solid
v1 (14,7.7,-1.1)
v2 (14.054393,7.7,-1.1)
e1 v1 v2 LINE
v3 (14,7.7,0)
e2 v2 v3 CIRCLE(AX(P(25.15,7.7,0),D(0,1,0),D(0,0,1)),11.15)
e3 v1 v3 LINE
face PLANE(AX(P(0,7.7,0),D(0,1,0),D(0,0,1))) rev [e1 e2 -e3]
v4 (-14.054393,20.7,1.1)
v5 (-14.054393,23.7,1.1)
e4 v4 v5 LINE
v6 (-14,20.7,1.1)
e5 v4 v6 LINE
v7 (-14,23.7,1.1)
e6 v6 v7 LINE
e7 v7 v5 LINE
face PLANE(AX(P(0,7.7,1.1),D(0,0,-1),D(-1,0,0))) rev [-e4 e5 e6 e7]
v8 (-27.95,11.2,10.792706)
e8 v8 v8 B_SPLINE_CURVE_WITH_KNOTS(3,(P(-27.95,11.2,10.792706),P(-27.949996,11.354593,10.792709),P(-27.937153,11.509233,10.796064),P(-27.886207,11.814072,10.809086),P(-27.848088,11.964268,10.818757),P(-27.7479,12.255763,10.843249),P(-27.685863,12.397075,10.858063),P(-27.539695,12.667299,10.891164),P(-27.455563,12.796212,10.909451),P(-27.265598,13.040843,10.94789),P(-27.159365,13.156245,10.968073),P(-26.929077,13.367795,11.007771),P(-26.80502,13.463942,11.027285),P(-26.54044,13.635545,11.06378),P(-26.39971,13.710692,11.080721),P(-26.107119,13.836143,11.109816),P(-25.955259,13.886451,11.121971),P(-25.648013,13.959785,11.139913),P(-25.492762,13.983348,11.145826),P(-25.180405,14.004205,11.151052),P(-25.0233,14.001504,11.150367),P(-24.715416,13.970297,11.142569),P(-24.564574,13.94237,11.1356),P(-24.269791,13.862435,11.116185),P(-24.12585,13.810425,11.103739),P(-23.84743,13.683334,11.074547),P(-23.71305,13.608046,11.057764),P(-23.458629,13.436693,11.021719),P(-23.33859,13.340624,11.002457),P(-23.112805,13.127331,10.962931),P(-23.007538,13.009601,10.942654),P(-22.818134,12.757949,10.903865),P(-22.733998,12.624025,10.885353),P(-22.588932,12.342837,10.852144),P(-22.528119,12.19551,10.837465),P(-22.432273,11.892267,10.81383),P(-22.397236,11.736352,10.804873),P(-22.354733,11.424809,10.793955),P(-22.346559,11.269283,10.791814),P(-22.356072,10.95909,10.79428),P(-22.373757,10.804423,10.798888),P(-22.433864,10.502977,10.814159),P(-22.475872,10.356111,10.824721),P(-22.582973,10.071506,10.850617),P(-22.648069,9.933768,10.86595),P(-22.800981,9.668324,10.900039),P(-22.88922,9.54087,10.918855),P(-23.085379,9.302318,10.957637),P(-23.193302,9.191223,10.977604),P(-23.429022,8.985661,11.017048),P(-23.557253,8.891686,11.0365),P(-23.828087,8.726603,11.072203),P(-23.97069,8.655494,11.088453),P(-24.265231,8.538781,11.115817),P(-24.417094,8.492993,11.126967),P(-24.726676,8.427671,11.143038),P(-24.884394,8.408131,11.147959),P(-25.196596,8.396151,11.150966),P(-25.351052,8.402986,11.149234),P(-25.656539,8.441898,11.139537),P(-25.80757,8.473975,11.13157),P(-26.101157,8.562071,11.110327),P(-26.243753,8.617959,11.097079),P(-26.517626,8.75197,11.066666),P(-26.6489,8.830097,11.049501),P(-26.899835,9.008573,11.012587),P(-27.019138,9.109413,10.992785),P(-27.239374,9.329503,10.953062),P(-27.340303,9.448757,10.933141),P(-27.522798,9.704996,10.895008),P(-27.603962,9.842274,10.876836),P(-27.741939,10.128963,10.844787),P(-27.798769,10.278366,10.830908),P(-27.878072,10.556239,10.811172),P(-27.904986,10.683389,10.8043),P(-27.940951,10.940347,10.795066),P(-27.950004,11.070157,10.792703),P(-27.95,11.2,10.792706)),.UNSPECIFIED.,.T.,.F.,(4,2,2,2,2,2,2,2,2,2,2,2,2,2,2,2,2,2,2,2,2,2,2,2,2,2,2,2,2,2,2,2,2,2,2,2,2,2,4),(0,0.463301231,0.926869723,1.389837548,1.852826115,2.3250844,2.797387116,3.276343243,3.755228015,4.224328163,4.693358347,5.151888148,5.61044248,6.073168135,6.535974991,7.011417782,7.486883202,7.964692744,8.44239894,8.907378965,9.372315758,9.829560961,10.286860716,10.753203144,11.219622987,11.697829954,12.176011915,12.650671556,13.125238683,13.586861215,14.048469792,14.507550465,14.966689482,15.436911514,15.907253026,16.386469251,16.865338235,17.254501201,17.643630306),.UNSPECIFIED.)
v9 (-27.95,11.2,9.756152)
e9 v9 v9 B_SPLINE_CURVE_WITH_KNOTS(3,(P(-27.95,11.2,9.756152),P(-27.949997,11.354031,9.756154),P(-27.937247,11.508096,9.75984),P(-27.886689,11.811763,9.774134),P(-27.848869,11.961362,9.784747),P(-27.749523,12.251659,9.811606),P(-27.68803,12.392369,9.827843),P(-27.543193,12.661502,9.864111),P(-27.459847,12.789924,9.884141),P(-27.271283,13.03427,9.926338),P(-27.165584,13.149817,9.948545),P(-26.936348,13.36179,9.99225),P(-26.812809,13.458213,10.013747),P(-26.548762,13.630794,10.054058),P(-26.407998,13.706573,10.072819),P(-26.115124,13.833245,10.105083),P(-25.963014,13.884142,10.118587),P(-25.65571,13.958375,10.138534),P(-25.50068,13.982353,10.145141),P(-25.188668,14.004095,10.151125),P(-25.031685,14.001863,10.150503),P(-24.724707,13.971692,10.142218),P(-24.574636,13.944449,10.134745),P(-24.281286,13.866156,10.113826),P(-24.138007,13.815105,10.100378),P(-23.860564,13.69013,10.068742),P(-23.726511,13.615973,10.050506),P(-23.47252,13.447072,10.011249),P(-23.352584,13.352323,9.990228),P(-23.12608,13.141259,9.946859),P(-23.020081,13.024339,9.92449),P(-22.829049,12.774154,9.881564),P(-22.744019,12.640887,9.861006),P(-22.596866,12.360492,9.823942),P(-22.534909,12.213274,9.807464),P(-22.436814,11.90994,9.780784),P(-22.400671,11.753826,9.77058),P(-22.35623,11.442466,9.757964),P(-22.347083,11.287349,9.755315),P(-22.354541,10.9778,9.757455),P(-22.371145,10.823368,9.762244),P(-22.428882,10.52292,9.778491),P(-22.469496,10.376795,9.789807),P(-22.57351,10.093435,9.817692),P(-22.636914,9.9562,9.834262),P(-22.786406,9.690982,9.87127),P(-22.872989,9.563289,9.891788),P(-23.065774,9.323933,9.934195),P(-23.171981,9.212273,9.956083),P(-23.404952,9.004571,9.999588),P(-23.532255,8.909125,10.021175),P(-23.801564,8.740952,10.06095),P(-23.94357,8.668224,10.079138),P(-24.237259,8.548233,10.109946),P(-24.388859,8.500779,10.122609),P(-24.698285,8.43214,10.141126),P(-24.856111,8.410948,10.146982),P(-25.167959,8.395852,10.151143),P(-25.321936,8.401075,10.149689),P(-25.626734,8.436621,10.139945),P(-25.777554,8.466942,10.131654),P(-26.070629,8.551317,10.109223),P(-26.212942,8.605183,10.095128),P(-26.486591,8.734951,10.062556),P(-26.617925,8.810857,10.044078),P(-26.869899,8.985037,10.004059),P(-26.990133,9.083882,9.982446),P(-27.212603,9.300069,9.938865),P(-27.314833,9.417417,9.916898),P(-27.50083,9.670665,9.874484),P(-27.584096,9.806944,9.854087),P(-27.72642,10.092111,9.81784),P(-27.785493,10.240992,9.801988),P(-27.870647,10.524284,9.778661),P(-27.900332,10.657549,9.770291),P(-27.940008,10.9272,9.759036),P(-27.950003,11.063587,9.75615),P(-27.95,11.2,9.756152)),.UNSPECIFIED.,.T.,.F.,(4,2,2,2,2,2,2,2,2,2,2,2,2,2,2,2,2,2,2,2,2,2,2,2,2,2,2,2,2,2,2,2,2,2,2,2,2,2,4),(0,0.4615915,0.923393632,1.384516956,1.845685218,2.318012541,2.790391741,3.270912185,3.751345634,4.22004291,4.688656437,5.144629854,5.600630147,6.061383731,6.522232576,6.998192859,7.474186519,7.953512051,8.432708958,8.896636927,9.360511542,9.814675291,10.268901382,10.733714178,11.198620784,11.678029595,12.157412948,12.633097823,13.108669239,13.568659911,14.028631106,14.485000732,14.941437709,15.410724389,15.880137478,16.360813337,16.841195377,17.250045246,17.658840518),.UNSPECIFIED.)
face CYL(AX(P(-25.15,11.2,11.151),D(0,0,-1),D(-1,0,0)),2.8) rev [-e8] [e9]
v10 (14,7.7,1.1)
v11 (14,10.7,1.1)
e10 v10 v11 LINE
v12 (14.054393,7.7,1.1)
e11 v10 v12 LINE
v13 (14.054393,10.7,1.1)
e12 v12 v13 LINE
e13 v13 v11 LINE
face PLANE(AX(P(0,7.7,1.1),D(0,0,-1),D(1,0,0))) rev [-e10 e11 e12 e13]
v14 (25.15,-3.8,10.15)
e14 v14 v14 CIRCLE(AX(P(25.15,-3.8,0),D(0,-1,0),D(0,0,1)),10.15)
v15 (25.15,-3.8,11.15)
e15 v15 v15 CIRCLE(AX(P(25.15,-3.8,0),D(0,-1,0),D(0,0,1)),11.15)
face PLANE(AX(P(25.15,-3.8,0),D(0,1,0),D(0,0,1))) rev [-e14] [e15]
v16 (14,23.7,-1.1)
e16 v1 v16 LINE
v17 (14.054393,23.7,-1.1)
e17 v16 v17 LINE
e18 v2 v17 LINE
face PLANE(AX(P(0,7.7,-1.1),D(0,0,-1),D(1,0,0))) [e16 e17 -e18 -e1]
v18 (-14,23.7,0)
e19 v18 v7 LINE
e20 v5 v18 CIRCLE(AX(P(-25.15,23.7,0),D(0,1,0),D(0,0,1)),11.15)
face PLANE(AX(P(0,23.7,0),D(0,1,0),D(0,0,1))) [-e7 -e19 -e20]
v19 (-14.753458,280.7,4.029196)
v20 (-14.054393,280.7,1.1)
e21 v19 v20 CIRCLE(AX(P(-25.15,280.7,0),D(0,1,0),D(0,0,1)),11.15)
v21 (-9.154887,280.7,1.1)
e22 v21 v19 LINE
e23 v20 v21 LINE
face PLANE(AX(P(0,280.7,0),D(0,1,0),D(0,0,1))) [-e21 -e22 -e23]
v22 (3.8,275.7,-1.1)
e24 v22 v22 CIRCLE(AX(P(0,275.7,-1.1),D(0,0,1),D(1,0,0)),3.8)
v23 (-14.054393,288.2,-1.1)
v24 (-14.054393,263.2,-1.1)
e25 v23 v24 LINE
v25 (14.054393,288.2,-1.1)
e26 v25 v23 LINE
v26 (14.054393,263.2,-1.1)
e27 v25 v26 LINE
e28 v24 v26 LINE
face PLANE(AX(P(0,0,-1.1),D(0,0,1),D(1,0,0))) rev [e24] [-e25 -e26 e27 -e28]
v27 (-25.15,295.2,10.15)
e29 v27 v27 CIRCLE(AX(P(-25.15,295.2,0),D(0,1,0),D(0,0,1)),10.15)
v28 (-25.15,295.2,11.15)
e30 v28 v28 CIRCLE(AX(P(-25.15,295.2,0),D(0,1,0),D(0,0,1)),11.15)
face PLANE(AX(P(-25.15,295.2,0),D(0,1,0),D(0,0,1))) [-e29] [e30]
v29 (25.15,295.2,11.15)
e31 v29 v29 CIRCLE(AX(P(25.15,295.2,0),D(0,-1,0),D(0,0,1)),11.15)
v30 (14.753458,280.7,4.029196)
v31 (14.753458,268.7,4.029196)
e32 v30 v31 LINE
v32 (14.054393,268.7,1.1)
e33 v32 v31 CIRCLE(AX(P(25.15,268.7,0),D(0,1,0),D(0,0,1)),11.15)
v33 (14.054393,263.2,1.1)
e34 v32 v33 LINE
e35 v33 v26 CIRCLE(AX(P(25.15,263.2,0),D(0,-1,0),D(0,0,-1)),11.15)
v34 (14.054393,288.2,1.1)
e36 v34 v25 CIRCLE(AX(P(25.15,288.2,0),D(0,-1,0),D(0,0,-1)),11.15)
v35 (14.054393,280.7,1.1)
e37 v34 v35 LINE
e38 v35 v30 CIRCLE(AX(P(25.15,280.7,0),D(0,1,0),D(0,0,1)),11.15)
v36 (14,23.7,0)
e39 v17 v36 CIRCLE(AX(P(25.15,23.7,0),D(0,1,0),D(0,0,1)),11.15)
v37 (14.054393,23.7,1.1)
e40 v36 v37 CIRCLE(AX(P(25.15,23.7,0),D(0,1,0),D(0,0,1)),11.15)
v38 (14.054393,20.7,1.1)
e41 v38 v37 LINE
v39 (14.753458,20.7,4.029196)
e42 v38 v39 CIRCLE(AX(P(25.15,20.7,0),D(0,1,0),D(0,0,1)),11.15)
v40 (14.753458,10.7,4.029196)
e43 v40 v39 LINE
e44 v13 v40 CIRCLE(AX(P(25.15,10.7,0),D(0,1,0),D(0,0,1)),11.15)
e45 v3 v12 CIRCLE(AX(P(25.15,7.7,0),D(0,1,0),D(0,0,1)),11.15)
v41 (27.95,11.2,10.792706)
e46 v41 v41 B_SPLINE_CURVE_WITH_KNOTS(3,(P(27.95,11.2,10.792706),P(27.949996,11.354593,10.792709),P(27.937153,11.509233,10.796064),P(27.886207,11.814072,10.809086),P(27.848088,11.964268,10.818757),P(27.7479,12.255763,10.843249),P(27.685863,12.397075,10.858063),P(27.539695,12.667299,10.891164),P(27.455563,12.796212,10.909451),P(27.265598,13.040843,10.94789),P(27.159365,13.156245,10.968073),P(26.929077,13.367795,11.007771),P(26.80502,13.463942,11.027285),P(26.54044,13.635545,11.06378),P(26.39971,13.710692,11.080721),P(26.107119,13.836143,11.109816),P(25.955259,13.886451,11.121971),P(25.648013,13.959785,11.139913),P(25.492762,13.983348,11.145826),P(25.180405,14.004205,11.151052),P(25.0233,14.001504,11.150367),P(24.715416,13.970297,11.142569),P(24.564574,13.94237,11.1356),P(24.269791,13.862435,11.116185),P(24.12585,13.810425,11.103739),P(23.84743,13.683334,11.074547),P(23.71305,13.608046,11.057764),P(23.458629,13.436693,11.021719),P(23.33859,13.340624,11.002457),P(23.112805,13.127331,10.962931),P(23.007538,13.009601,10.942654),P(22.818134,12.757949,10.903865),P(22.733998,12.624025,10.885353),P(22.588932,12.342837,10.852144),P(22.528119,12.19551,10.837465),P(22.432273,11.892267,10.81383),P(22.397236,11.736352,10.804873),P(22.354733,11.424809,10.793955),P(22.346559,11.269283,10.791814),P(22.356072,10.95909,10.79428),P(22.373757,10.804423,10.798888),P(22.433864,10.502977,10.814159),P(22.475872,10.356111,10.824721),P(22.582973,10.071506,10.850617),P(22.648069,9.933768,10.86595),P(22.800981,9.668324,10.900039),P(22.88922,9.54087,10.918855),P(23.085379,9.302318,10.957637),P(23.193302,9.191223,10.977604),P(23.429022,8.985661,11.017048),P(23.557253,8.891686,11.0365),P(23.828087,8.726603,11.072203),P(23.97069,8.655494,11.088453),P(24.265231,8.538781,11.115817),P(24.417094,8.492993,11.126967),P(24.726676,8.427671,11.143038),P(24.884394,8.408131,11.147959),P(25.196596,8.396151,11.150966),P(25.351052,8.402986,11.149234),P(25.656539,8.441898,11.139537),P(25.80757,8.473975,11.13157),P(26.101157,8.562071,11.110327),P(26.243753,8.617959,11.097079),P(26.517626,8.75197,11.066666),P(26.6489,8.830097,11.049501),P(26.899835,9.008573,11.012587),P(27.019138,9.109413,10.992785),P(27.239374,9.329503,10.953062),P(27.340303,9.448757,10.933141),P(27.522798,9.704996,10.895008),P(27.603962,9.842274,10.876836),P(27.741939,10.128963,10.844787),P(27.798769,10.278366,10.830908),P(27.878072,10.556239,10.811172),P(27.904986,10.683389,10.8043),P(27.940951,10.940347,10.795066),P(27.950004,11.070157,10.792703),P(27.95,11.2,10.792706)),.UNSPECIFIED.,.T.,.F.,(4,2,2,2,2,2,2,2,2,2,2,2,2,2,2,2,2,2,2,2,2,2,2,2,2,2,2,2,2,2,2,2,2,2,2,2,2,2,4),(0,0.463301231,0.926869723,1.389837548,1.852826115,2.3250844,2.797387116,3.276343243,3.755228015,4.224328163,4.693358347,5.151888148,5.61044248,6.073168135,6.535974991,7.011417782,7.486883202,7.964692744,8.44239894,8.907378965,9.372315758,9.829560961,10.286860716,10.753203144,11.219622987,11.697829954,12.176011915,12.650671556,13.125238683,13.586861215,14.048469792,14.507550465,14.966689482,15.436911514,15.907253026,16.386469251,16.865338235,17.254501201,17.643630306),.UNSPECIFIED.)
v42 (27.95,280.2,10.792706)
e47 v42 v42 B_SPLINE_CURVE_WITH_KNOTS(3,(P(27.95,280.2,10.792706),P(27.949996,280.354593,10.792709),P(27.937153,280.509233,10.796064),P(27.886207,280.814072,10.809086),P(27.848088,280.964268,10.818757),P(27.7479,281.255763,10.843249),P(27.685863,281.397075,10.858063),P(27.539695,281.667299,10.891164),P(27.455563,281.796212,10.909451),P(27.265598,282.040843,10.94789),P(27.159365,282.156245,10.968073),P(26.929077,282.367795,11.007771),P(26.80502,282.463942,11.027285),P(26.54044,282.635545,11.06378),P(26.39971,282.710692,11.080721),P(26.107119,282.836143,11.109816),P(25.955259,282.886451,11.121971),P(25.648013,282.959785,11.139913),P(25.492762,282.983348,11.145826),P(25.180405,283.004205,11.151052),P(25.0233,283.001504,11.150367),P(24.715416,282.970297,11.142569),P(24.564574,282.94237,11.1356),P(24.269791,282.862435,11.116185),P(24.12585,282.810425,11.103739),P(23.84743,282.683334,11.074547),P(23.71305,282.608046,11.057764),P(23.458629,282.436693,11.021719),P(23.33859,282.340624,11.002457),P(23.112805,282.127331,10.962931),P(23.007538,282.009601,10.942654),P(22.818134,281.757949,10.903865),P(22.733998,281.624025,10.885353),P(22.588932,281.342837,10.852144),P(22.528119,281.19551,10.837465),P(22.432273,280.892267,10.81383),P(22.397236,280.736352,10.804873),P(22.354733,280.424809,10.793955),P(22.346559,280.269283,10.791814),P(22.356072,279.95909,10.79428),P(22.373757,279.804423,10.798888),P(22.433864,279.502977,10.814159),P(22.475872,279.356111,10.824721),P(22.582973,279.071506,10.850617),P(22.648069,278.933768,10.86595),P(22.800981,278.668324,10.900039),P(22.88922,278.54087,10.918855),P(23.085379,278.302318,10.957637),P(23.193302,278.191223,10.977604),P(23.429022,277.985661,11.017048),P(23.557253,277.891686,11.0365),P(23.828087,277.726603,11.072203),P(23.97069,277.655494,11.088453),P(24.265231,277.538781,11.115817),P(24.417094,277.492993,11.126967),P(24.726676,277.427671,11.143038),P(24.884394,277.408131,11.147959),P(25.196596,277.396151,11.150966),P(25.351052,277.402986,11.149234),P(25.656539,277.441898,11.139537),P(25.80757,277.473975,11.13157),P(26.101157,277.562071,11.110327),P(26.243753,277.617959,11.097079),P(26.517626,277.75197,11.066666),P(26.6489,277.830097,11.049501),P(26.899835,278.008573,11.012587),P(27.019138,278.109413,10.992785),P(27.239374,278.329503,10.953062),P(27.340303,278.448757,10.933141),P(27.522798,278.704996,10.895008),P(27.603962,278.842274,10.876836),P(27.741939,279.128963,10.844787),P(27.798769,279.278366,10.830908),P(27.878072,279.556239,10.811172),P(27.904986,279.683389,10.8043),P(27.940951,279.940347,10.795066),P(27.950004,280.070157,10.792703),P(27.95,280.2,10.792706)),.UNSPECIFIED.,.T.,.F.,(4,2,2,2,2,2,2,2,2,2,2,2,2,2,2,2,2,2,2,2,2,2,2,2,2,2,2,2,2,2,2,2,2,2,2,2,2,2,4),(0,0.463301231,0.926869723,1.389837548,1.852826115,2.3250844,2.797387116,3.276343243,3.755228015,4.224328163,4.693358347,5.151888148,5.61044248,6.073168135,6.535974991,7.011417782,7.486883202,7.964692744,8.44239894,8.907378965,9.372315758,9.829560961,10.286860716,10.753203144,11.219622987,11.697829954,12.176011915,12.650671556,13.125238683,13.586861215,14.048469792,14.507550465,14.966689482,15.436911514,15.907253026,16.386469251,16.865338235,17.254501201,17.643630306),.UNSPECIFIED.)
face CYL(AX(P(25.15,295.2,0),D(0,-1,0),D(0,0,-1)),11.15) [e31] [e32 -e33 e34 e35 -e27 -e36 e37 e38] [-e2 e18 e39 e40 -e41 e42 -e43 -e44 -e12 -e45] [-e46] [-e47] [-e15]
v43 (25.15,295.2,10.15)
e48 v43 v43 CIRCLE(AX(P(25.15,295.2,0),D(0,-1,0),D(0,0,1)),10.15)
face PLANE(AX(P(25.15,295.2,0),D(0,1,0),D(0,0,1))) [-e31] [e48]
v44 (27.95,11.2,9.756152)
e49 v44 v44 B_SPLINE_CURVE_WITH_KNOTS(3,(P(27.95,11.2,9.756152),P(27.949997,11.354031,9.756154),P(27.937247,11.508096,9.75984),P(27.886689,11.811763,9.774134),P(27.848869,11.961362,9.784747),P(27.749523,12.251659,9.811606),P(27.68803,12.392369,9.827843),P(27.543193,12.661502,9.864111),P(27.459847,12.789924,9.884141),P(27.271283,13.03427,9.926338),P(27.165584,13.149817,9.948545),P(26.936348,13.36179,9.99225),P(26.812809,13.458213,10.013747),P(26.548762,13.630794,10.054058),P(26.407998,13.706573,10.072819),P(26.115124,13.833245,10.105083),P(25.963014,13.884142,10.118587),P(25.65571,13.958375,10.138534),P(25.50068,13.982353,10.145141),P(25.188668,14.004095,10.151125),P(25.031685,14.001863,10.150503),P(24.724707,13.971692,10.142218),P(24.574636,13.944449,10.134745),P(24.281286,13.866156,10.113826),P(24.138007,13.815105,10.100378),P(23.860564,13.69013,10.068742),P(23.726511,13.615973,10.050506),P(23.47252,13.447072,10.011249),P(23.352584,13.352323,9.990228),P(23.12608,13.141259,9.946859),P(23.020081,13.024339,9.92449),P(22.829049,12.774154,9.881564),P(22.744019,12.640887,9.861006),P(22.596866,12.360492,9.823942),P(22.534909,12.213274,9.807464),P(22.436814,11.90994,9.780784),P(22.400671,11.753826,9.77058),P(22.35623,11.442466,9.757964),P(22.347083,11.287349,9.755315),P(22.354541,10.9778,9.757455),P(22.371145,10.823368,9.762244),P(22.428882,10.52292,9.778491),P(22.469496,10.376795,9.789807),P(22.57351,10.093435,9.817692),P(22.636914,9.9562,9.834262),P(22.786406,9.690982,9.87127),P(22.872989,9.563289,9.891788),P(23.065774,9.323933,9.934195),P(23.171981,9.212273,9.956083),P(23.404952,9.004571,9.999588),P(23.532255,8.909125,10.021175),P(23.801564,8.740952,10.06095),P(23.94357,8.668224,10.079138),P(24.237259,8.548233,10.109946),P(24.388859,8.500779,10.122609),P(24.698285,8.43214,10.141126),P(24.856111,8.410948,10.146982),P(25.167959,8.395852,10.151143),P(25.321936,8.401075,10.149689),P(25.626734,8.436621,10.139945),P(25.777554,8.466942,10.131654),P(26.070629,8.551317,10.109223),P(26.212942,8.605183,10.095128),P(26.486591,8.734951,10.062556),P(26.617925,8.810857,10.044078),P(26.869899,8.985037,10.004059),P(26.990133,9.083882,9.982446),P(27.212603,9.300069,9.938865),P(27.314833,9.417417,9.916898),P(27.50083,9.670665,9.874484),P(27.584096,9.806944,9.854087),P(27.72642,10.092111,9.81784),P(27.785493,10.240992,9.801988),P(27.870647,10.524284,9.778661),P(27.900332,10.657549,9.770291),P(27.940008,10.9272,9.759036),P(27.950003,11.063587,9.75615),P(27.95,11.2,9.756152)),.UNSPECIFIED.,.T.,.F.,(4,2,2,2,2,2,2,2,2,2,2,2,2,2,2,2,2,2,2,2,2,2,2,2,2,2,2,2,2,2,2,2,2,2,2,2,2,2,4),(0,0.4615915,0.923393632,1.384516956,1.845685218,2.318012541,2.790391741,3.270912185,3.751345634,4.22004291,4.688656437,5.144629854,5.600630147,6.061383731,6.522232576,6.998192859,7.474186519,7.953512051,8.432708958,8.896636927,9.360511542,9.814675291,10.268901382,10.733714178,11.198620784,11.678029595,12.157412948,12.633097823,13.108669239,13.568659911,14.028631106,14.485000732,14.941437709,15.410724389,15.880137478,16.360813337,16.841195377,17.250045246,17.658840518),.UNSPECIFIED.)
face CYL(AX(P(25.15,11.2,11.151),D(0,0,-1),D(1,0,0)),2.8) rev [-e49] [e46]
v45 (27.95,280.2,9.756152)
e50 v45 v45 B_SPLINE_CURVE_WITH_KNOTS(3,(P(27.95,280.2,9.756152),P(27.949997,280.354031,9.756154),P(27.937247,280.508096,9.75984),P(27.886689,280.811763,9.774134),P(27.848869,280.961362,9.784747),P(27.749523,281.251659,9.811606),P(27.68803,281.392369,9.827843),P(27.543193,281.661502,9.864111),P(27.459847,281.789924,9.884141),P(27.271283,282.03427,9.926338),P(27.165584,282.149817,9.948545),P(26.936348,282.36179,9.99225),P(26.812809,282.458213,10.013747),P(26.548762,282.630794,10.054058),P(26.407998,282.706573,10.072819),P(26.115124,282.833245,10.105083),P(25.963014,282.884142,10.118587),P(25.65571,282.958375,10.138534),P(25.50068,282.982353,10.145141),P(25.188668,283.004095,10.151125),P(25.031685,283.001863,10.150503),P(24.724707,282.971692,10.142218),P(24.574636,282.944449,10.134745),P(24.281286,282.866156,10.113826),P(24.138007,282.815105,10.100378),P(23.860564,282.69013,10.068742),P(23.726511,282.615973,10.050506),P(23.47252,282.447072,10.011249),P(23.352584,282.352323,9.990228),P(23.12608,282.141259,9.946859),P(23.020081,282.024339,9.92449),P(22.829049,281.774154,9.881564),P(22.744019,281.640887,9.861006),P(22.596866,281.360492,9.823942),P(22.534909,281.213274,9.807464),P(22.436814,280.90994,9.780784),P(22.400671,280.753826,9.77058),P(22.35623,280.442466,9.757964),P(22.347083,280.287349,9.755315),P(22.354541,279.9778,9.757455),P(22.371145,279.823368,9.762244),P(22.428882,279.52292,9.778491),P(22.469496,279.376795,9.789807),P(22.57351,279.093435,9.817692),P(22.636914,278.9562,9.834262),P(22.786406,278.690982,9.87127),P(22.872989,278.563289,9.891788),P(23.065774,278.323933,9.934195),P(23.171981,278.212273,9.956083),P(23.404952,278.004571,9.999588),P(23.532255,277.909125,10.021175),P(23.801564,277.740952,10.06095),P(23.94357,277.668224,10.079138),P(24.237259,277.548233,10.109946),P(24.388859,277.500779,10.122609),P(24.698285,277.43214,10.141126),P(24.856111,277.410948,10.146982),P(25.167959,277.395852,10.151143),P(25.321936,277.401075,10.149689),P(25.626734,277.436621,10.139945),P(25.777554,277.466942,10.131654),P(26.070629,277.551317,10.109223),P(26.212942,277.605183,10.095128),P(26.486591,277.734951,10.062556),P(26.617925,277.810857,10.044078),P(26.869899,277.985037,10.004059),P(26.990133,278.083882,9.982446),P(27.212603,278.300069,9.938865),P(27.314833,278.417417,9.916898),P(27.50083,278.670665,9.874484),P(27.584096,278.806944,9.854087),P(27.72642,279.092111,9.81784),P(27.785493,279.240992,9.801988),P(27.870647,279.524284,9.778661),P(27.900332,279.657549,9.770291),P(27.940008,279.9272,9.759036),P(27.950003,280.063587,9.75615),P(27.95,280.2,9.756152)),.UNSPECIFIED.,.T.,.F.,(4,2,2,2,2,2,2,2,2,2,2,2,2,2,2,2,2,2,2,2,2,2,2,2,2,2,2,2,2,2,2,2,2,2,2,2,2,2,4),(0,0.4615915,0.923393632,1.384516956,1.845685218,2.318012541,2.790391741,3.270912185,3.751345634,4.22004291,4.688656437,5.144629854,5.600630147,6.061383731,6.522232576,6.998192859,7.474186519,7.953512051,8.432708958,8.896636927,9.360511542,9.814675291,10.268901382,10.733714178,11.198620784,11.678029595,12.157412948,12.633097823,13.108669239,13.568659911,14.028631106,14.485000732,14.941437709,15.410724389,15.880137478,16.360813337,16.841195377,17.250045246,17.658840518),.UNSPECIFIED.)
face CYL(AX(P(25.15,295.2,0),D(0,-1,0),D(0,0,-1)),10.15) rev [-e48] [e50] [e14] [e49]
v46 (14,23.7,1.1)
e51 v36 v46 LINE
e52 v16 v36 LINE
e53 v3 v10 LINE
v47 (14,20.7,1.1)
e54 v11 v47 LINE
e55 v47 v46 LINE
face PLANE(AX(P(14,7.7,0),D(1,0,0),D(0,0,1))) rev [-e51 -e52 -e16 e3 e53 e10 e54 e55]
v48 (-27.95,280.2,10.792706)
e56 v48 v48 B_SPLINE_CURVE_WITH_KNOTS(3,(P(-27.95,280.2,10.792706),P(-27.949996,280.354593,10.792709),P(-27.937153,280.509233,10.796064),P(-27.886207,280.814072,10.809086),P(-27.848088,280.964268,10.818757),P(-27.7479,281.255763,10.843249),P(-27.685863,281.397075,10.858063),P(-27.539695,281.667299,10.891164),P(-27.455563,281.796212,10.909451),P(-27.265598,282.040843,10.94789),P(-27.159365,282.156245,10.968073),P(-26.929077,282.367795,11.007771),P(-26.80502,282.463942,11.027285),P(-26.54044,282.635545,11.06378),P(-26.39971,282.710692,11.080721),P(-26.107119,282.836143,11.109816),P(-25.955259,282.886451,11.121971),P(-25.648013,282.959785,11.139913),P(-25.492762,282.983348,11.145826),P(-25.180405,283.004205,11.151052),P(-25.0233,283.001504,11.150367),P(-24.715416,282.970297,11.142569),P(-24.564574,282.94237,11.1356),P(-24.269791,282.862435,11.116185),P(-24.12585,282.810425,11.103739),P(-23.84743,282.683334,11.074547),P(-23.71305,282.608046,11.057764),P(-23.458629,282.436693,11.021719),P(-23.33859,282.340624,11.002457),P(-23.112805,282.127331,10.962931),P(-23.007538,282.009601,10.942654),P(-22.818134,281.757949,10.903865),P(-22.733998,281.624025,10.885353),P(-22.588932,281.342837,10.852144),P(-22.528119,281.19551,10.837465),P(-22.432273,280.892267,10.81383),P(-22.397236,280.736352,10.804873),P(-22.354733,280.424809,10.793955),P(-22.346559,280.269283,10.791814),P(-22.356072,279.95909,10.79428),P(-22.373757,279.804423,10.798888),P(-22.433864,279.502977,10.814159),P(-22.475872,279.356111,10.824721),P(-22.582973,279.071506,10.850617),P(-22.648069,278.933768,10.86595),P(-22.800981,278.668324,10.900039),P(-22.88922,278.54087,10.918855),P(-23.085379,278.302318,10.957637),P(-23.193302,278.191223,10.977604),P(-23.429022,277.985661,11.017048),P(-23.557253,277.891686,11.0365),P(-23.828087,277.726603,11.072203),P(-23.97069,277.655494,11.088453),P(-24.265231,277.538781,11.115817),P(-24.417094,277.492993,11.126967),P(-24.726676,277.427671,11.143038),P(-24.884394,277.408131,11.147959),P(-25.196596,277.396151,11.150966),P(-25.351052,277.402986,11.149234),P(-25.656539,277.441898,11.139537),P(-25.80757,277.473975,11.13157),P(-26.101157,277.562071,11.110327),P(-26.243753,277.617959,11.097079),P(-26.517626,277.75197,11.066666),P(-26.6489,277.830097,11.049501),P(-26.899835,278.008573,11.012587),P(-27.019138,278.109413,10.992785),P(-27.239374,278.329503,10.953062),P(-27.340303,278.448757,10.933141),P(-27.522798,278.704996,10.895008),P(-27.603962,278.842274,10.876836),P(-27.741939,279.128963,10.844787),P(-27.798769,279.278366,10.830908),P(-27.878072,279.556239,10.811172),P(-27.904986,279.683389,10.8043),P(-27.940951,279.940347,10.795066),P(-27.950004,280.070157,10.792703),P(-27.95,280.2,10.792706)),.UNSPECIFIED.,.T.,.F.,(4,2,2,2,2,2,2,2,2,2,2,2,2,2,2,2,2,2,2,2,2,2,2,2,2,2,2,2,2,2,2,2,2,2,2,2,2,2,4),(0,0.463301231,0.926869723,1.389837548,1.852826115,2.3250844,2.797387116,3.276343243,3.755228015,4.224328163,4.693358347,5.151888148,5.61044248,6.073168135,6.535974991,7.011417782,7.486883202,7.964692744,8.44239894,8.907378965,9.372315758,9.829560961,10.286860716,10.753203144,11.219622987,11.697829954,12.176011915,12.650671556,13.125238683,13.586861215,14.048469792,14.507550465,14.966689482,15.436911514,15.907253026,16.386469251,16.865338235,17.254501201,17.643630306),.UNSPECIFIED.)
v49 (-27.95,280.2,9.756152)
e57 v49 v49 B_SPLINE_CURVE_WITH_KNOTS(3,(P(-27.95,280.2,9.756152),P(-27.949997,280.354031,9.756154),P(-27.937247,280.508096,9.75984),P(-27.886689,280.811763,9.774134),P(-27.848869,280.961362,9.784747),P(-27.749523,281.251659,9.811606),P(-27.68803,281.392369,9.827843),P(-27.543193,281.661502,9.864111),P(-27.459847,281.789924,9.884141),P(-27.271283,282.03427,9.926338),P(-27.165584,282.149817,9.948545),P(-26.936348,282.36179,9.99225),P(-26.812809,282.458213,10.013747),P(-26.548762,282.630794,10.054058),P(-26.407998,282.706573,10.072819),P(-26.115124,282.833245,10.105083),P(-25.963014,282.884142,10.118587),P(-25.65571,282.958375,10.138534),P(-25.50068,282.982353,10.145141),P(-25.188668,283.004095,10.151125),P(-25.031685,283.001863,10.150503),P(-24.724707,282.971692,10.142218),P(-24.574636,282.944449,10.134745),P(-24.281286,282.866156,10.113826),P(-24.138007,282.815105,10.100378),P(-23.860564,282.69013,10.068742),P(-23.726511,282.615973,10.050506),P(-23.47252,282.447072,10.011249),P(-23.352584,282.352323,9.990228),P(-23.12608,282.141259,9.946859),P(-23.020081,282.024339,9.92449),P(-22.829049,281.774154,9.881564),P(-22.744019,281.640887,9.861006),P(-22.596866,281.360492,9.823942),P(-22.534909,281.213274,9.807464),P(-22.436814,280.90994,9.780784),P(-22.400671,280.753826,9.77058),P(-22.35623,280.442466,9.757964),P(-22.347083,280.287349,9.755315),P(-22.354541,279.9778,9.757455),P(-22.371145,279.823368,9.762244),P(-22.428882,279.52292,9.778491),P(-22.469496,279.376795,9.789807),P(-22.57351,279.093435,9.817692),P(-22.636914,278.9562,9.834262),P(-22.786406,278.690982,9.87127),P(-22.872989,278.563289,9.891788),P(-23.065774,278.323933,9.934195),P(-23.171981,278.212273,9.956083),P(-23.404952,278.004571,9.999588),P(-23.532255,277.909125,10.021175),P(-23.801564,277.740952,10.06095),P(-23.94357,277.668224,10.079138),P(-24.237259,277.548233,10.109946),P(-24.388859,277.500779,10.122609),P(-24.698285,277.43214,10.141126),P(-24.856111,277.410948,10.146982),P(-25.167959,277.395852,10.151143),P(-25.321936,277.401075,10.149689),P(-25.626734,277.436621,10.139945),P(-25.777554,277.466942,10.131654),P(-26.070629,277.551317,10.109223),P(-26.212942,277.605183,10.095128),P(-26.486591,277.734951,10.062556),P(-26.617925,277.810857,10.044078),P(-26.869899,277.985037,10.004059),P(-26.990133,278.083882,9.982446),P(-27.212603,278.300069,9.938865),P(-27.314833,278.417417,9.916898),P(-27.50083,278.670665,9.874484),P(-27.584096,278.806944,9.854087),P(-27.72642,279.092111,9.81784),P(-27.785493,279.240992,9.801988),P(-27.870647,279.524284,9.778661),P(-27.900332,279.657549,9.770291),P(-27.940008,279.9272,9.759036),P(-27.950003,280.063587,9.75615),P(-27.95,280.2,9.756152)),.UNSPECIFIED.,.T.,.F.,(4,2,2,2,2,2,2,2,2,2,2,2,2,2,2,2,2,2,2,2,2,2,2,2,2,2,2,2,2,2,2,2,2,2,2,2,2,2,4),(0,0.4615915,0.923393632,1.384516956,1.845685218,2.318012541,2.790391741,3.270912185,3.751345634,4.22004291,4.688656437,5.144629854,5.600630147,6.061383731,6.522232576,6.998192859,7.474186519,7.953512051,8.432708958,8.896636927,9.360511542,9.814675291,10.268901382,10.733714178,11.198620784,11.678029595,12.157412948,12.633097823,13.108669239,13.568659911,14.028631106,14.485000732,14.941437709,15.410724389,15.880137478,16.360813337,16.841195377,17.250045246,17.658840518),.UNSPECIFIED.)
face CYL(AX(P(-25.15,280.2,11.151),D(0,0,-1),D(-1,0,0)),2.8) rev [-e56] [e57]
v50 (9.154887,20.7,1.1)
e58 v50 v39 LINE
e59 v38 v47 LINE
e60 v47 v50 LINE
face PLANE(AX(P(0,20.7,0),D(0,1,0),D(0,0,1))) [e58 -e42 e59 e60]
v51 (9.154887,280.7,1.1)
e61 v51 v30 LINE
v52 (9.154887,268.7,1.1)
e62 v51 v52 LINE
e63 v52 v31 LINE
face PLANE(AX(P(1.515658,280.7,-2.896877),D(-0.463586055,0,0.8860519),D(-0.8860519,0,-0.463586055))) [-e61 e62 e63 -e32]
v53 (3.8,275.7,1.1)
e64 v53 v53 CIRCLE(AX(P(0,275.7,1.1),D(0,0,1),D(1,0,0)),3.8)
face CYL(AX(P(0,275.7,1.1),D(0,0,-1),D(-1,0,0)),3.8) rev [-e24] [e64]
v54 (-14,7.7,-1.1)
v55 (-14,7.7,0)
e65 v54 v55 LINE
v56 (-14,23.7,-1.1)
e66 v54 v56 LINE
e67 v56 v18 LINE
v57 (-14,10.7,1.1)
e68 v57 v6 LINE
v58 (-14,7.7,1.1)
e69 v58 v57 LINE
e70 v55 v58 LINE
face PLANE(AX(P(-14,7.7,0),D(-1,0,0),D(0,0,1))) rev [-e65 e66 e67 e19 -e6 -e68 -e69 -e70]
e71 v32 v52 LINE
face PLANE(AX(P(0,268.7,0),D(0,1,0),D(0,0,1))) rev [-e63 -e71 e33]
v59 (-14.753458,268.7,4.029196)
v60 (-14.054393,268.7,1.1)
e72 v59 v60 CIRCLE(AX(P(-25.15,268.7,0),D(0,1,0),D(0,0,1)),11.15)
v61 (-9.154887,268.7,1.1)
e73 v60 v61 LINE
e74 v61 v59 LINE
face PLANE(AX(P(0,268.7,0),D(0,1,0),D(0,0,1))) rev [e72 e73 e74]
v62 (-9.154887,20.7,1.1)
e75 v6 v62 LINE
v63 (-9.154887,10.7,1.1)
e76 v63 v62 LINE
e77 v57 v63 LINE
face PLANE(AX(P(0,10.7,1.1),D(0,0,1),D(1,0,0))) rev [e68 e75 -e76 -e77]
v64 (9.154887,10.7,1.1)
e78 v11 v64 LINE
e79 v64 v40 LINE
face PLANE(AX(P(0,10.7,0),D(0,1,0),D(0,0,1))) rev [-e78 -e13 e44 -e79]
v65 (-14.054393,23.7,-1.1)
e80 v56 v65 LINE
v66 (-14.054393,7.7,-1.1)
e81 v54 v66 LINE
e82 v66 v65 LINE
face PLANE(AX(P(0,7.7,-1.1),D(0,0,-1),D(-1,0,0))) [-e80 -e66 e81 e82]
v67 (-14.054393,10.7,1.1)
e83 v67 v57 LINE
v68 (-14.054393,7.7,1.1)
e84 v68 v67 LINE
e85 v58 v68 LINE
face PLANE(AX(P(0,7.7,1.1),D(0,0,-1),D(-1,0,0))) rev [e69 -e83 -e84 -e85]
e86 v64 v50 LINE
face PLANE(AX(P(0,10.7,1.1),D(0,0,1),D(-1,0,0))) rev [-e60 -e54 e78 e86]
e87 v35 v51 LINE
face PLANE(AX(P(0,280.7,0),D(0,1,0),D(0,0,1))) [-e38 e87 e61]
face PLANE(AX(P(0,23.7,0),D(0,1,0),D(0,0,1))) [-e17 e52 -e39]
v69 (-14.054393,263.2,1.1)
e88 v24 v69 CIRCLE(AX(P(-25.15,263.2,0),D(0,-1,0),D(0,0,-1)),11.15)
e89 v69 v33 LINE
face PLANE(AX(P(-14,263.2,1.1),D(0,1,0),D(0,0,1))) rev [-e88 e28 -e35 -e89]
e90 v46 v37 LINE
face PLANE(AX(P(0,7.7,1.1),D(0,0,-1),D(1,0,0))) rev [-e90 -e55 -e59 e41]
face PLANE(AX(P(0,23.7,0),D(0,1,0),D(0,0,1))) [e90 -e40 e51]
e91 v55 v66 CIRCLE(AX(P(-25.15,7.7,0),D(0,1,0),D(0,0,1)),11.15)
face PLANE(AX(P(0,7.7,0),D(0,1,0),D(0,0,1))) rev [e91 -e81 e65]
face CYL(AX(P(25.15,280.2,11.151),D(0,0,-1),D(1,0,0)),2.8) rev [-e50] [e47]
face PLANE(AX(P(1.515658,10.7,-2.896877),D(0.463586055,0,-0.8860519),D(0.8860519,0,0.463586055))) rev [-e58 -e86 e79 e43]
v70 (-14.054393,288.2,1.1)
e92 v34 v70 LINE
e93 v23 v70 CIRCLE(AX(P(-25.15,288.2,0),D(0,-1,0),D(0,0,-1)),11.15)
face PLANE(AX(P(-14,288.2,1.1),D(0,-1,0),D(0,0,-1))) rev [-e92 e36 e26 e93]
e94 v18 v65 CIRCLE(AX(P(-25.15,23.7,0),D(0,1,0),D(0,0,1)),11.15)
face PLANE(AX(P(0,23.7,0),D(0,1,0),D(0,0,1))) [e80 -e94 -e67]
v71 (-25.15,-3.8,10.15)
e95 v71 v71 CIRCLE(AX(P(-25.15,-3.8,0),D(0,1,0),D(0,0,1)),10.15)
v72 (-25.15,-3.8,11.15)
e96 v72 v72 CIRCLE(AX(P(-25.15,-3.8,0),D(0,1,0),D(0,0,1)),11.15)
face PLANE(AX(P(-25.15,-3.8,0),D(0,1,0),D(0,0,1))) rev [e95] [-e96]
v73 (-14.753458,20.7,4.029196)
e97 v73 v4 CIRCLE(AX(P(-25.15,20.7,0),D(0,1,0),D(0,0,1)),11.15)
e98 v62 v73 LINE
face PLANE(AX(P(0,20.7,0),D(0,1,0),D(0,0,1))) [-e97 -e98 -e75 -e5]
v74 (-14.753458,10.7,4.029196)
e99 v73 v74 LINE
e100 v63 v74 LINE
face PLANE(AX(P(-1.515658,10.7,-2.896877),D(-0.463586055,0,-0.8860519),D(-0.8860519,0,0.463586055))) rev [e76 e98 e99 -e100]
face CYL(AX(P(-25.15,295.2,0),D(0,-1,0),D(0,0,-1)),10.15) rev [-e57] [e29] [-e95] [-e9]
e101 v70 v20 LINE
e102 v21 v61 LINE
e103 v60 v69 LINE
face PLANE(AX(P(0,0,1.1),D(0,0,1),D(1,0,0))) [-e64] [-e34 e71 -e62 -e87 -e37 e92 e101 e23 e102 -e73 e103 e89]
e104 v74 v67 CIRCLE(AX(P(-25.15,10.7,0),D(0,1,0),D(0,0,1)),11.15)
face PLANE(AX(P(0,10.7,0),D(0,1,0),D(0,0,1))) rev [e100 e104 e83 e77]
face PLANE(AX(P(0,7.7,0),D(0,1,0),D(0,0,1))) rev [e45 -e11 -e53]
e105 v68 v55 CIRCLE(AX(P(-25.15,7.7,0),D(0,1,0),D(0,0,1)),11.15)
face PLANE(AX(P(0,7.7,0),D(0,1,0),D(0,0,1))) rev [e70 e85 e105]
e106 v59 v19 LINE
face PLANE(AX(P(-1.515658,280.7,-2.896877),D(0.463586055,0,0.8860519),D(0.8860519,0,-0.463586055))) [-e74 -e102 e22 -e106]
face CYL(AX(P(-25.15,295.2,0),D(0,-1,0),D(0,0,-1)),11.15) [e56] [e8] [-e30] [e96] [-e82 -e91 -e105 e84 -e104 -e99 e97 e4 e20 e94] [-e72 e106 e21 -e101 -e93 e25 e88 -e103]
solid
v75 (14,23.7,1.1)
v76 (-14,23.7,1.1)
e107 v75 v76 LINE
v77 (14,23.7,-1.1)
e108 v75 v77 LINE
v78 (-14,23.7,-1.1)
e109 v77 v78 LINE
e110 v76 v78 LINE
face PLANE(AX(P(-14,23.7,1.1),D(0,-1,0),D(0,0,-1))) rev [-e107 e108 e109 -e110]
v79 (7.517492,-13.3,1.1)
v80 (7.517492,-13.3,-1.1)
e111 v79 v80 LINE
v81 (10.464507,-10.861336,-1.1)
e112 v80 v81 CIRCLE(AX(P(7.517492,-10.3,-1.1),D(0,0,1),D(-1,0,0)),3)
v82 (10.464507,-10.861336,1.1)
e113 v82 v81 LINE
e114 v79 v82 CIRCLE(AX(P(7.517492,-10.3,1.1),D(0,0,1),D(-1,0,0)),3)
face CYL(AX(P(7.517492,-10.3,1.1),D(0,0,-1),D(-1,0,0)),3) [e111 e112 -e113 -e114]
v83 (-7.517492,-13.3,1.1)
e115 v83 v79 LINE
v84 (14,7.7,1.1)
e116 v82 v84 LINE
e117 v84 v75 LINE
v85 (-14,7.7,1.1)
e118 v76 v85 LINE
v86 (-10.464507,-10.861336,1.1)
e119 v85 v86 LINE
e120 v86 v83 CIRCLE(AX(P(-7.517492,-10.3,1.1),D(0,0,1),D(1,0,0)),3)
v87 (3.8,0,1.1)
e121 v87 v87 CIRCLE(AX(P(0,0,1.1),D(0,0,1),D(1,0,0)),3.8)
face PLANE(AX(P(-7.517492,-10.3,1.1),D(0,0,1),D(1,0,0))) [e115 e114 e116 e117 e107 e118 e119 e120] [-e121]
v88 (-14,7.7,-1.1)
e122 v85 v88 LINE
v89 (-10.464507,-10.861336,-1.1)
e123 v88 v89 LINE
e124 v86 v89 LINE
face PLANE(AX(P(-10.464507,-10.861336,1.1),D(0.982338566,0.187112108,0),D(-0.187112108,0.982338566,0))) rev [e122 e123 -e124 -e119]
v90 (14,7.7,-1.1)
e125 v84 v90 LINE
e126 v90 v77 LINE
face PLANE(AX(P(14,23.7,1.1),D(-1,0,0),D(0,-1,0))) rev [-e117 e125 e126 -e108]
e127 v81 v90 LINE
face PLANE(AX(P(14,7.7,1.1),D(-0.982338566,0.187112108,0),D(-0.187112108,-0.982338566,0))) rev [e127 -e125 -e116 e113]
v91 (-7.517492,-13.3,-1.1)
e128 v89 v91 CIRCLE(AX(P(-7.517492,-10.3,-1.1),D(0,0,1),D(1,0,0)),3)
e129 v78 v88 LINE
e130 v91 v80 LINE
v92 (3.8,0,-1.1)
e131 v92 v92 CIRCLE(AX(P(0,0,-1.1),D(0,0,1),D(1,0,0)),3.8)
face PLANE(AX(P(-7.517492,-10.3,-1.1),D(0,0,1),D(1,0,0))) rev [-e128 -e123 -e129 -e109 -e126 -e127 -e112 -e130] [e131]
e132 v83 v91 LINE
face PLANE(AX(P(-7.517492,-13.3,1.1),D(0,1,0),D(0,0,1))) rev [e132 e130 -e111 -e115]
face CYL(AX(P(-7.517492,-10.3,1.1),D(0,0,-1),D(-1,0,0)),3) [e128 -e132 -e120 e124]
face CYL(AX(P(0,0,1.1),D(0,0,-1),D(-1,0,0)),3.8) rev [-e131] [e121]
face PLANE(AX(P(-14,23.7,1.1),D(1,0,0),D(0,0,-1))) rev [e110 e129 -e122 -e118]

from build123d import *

# Parameters (mm, degrees)
SKETCH1_R                = 3.8
BOSS_EXTRUDE1_DEPTH      = 1.1
SKETCH1_W                = 28
SKETCH1_H                = 25
BOSS_EXTRUDE1_2_DEPTH    = 1.1
BOSS_EXTRUDE2_DEPTH      = 295.2
BOSS_EXTRUDE2_DEPTH_BACK = 3.8
SKETCH2_R                = 11.15
SKETCH2_R_2              = 10.15
SKETCH4_W                = 0.054392761
SKETCH4_H                = 2.2
BOSS_EXTRUDE22_DEPTH     = 16
BOSS_EXTRUDE23_START     = 239.5
SKETCH4_5_W              = 0.054392761
SKETCH4_5_H              = 2.2
BOSS_EXTRUDE23_DEPTH     = 25
BOSS_EXTRUDE24_START     = -13
BOSS_EXTRUDE24_DEPTH     = 10
BOSS_EXTRUDE25_START     = 245
BOSS_EXTRUDE25_DEPTH     = 12
CUT_EXTRUDE1_REACH       = 299.632
CUT_EXTRUDE1_END_RADIUS  = 11.15
SKETCH5_R                = 2.8


# Read off the part's stored shape, not the designer's step: Boss-Extrude24, Boss-Extrude25
with BuildPart() as part:
    # Sketch1 → Boss-Extrude1 (new, symmetric)
    with BuildSketch(Plane.XY):
        with BuildLine():
            Line((-14, 23.7), (14, 23.7))
            Line((14, 23.7), (14, 7.7))
            Line((14, 7.7), (10.464507367, -10.861336324))
            ThreePointArc((10.464507367, -10.861336324), (9.430080362, -12.611277674), (7.517491668, -13.3))
            Line((7.517491668, -13.3), (-7.517491668, -13.3))
            ThreePointArc((-7.517491668, -13.3), (-9.430080362, -12.611277674), (-10.464507367, -10.861336324))
            Line((-10.464507367, -10.861336324), (-14, 7.7))
            Line((-14, 7.7), (-14, 23.7))
        make_face()
        Circle(SKETCH1_R, mode=Mode.SUBTRACT)
    extrude(amount=BOSS_EXTRUDE1_DEPTH, both=True)


with BuildPart() as body_2:
    # Sketch1 → Boss-Extrude1 2 (new, symmetric)
    with BuildSketch(Plane.XY):
        with Locations((0, 275.7)):
            Rectangle(SKETCH1_W, SKETCH1_H)
        with Locations((0, 275.7)):
            Circle(SKETCH1_R, mode=Mode.SUBTRACT)
    extrude(amount=BOSS_EXTRUDE1_2_DEPTH, both=True)


with BuildPart() as body_3:
    # Sketch2 → Boss-Extrude2 (new, two sides: drawn at the far end of the back side and taken through both)
    with BuildSketch(Plane(origin=(0, 0, 0), x_dir=(1, 0, 0), z_dir=(0, 1, 0)).offset(-BOSS_EXTRUDE2_DEPTH_BACK)):
        with Locations(Location((-25.15, 0, 0), (0, 0, 270))):
            Circle(SKETCH2_R)
        with Locations(Location((-25.15, 0, 0), (0, 0, 270))):
            Circle(SKETCH2_R_2, mode=Mode.SUBTRACT)
    extrude(amount=BOSS_EXTRUDE2_DEPTH + BOSS_EXTRUDE2_DEPTH_BACK)

    # Cut-Extrude1: up to this cylinder (the profile starts inside it)
    cut_extrude1_end = Plane(origin=(-25.15, 145.7, 0), z_dir=(0, -1, 0)) * Cylinder(CUT_EXTRUDE1_END_RADIUS, 891.564, mode=Mode.PRIVATE)
    # Sketch5 → Cut-Extrude1 (cut, up to the surface)
    with BuildSketch(Plane.XY, mode=Mode.PRIVATE) as cut_extrude1_sk1:
        with Locations(Location((-25.15, 280.2, 0), (0, 0, 180))):
            Circle(SKETCH5_R)
    cut_extrude1_tool1 = extrude(cut_extrude1_sk1.sketch, amount=CUT_EXTRUDE1_REACH, mode=Mode.PRIVATE) & cut_extrude1_end
    add(cut_extrude1_tool1.solids().sort_by_distance((-25.15, 280.2, 0))[0], mode=Mode.SUBTRACT)
    # Sketch5 → Cut-Extrude1 (cut, up to the surface)
    with BuildSketch(Plane.XY, mode=Mode.PRIVATE) as cut_extrude1_sk2:
        with Locations(Location((-25.15, 11.2, 0), (0, 0, 180))):
            Circle(SKETCH5_R)
    cut_extrude1_tool2 = extrude(cut_extrude1_sk2.sketch, amount=CUT_EXTRUDE1_REACH, mode=Mode.PRIVATE) & cut_extrude1_end
    add(cut_extrude1_tool2.solids().sort_by_distance((-25.15, 11.2, 0))[0], mode=Mode.SUBTRACT)


with BuildPart() as body_4:
    # Sketch4 → Boss-Extrude22 (new body)
    with BuildSketch(Plane(origin=(0, 23.7, 0), x_dir=(1, 0, 0), z_dir=(0, 1, 0))):
        with Locations((-14.027196381, 0)):
            Rectangle(SKETCH4_W, SKETCH4_H)
    extrude(amount=-BOSS_EXTRUDE22_DEPTH)


with BuildPart() as body_5:
    # Sketch4<5> → Boss-Extrude23 (new body)
    with BuildSketch(Plane(origin=(0, 23.7, 0), x_dir=(1, 0, 0), z_dir=(0, 1, 0)).offset(BOSS_EXTRUDE23_START)):
        with Locations((-14.027196381, 0)):
            Rectangle(SKETCH4_5_W, SKETCH4_5_H)
    extrude(amount=BOSS_EXTRUDE23_DEPTH)


with BuildPart() as body_6:
    # Boss-Extrude24 outline → Boss-Extrude24 (new body)
    with BuildSketch(Plane(origin=(0, 23.7, 0), x_dir=(1, 0, 0), z_dir=(0, 1, 0)).offset(BOSS_EXTRUDE24_START)):
        with BuildLine():
            ThreePointArc((-14.154887449, -1.1), (-14.416508117, -2.625766935), (-14.888786621, -4.1))
            Line((-14.888786621, -4.1), (-9.154887449, -1.1))
            Line((-9.154887449, -1.1), (-14.154887449, -1.1))
        make_face()
    extrude(amount=BOSS_EXTRUDE24_DEPTH)


with BuildPart() as body_7:
    # Boss-Extrude25 outline → Boss-Extrude25 (new body)
    with BuildSketch(Plane(origin=(0, 23.7, 0), x_dir=(1, 0, 0), z_dir=(0, 1, 0)).offset(BOSS_EXTRUDE25_START)):
        with BuildLine():
            Line((-9.154887449, -1.1), (-14.154887449, -1.1))
            ThreePointArc((-14.154887449, -1.1), (-14.416508117, -2.625766935), (-14.888786621, -4.1))
            Line((-14.888786621, -4.1), (-9.154887449, -1.1))
        make_face()
    extrude(amount=BOSS_EXTRUDE25_DEPTH)


with BuildPart() as body_8:
    # Mirror18: mirrored copy
    add(body_3.part.mirror(Plane(origin=(0, 0, 0), x_dir=(0, 0, 1), z_dir=(1, 0, 0))))


with BuildPart() as body_9:
    # Mirror18 2: mirrored copy
    add(body_4.part.mirror(Plane(origin=(0, 0, 0), x_dir=(0, 0, 1), z_dir=(1, 0, 0))))


with BuildPart() as body_10:
    # Mirror18 3: mirrored copy
    add(body_5.part.mirror(Plane(origin=(0, 0, 0), x_dir=(0, 0, 1), z_dir=(1, 0, 0))))


with BuildPart() as body_11:
    # Mirror18 4: mirrored copy
    add(body_6.part.mirror(Plane(origin=(0, 0, 0), x_dir=(0, 0, 1), z_dir=(1, 0, 0))))


with BuildPart() as body_12:
    # Mirror18 5: mirrored copy
    add(body_7.part.mirror(Plane(origin=(0, 0, 0), x_dir=(0, 0, 1), z_dir=(1, 0, 0))))


with BuildPart() as body_2_1:
    add(body_2.part)

    # Combine2: union body 3, body 4, body 5, body 6, body 7, body 8, body 9, body 10, body 11, body 12
    add(body_3.part)
    add(body_4.part)
    add(body_5.part)
    add(body_6.part)
    add(body_7.part)
    add(body_8.part)
    add(body_9.part)
    add(body_10.part)
    add(body_11.part)
    add(body_12.part)


solid = Compound([part.part, body_2_1.part])
